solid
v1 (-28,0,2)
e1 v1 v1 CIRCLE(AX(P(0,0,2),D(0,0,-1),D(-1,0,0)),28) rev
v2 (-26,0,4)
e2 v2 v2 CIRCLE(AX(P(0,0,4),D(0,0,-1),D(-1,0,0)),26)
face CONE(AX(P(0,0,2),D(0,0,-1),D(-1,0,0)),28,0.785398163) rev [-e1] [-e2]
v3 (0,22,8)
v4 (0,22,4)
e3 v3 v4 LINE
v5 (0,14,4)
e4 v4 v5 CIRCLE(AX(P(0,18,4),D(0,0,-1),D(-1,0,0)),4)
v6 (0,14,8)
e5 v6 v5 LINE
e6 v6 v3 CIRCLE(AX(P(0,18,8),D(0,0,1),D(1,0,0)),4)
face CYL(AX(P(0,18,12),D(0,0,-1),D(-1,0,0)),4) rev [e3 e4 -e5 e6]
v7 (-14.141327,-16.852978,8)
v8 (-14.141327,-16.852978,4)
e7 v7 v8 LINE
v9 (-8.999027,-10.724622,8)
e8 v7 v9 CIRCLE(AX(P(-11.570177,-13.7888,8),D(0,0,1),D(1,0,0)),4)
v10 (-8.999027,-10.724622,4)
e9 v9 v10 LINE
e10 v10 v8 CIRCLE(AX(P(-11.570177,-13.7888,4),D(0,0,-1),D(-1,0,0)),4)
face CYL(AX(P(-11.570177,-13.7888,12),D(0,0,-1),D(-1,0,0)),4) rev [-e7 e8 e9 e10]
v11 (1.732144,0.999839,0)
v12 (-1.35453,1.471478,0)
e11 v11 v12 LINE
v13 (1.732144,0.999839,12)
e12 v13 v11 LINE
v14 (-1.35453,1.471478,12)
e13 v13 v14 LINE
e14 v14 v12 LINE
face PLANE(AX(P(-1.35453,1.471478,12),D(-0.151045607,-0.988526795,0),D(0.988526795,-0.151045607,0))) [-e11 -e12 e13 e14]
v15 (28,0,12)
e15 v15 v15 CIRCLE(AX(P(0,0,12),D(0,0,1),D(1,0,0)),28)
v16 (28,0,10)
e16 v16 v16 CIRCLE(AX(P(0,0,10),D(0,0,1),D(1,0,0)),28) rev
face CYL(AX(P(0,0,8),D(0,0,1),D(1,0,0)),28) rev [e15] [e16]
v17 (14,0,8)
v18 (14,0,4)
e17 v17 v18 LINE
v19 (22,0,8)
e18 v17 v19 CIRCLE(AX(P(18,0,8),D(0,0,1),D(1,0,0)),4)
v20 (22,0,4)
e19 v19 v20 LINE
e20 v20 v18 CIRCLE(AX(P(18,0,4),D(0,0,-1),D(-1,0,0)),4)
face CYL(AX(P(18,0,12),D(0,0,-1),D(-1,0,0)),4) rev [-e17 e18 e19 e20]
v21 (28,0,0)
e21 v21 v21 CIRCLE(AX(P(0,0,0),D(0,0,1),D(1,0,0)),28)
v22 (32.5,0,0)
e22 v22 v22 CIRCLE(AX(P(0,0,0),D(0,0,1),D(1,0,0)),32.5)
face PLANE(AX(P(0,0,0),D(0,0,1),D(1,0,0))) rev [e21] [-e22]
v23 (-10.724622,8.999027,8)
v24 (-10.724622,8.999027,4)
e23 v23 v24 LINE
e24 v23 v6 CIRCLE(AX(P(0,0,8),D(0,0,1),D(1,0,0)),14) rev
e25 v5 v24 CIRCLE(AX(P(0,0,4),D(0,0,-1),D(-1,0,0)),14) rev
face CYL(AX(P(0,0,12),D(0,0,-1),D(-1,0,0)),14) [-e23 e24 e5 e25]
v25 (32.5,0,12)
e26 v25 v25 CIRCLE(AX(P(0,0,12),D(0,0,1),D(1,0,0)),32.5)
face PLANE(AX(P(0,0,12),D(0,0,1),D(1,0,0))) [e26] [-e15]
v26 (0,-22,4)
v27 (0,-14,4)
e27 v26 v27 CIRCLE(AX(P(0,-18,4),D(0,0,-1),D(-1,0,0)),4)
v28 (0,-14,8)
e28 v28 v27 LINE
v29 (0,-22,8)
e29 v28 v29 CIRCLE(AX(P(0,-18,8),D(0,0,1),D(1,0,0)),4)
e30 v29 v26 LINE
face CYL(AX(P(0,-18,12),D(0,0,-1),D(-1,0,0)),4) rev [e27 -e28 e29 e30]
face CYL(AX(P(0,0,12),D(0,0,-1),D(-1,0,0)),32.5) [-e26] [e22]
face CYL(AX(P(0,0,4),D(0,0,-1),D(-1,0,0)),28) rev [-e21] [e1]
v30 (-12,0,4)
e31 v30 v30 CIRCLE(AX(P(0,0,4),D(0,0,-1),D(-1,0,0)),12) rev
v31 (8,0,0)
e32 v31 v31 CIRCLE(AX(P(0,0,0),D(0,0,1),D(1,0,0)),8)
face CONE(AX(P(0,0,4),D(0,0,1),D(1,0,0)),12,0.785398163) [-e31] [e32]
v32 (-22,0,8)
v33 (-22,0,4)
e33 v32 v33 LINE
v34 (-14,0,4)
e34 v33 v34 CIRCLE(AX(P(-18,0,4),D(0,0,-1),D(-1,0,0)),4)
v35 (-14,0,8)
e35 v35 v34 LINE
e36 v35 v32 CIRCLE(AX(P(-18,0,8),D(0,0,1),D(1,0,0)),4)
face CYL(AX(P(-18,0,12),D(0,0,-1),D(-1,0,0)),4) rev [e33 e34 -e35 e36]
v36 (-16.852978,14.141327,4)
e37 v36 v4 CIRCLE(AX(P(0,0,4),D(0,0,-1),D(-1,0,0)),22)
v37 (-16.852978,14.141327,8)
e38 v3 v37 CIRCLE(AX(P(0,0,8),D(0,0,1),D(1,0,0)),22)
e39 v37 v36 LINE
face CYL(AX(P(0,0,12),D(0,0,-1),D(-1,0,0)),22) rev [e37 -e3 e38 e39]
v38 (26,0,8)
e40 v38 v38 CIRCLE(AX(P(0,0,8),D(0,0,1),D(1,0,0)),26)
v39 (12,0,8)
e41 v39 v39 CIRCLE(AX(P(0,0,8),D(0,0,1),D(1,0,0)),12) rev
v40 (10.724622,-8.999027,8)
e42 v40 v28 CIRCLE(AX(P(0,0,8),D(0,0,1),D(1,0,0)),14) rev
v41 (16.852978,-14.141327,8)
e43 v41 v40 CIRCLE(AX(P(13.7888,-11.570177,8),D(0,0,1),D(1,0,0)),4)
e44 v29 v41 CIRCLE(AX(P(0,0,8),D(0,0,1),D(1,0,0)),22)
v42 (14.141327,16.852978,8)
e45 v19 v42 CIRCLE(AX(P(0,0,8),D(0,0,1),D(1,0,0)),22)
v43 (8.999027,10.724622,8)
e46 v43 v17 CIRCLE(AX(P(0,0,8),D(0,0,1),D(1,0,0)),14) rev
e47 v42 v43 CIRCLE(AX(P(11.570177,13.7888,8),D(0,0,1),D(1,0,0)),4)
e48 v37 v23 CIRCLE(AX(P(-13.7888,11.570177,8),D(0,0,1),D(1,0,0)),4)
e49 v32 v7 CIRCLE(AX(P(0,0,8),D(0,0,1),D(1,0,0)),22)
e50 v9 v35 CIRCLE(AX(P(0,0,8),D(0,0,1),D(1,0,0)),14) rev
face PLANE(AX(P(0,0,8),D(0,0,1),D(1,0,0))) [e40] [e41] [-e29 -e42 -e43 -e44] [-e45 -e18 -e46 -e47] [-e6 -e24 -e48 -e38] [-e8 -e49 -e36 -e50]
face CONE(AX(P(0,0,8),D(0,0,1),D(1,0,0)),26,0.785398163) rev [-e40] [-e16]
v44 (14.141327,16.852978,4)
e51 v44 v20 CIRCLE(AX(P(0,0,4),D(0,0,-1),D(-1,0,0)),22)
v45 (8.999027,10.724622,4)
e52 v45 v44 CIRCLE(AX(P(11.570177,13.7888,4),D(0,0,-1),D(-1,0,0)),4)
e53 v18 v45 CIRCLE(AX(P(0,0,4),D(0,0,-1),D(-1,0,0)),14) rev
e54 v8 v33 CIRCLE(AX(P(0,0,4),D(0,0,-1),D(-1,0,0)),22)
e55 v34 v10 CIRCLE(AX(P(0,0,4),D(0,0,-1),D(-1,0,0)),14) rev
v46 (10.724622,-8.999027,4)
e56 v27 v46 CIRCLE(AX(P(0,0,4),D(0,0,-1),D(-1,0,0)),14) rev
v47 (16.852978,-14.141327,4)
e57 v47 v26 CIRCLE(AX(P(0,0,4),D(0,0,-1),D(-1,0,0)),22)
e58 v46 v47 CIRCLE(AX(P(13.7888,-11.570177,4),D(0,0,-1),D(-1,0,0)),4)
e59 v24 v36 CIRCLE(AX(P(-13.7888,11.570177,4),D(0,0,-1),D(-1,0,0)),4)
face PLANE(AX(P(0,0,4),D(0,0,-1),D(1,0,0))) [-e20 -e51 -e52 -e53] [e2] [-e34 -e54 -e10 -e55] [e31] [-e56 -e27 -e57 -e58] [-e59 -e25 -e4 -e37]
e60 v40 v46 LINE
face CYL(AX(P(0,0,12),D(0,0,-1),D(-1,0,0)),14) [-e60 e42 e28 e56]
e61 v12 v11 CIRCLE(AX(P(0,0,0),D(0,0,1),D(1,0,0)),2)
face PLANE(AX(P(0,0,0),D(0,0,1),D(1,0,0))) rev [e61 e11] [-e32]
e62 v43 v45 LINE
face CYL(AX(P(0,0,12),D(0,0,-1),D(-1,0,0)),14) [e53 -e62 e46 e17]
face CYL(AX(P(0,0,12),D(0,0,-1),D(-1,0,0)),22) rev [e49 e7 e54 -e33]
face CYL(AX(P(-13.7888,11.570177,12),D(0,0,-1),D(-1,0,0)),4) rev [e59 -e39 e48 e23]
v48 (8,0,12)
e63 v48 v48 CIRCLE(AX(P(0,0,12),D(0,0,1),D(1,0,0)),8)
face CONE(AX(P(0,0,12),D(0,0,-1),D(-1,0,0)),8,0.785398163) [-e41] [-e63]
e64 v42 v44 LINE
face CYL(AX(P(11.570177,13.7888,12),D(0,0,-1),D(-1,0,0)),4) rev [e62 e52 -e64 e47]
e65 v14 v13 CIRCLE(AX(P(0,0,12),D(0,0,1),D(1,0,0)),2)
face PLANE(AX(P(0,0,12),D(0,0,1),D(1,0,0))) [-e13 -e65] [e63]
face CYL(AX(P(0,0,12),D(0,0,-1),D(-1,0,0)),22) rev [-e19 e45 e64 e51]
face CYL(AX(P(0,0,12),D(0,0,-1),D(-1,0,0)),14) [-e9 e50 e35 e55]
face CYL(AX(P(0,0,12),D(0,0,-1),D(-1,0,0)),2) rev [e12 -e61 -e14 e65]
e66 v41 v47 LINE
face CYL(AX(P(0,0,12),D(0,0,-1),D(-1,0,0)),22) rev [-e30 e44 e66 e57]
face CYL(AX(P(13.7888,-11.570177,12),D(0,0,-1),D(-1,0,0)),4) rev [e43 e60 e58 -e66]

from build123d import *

# Parameters (mm, degrees)
ESQUISSE1_R                  = 32.5
BOSS_EXTRU_1_DEPTH           = 12
ESQUISSE2_R                  = 28
ESQUISSE2_R_2                = 8
ENL_V_MAT_EXTRU_1_DEPTH      = 4
CHANFREIN1_SIZE              = 4
CHANFREIN2_SIZE              = 2
CHANFREIN1_OF_SYM_TRIE1_SIZE = 4
CHANFREIN2_OF_SYM_TRIE1_SIZE = 2


with BuildPart() as part:
    # Esquisse1 → Boss.-Extru.1 (new body)
    with BuildSketch(Plane.XY):
        Circle(ESQUISSE1_R)
        with BuildLine():
            Line((-1.354529956, 1.471478372), (1.732143973, 0.999838616))
            ThreePointArc((1.732143973, 0.999838616), (-0.302091213, -1.97705359), (-1.354529956, 1.471478372))
        make_face(mode=Mode.SUBTRACT)
        with BuildLine():
            ThreePointArc((-10.724622204, 8.999026536), (-5.916655664, 12.688309019), (0, 14))
            ThreePointArc((0, 14), (4, 18), (0, 22))
            ThreePointArc((0, 22), (-9.297601758, 19.938771315), (-16.852977749, 14.141327413))
            ThreePointArc((-16.852977749, 14.141327413), (-16.359950415, 8.505999202), (-10.724622204, 8.999026536))
        make_face(mode=Mode.SUBTRACT)
        with BuildLine():
            ThreePointArc((22, 0), (19.938771315, 9.297601758), (14.141327413, 16.852977749))
            ThreePointArc((14.141327413, 16.852977749), (8.505999202, 16.359950415), (8.999026536, 10.724622204))
            ThreePointArc((8.999026536, 10.724622204), (12.688309019, 5.916655664), (14, 0))
            ThreePointArc((14, 0), (18, -4), (22, 0))
        make_face(mode=Mode.SUBTRACT)
        with BuildLine():
            ThreePointArc((0, -22), (9.297601758, -19.938771315), (16.852977749, -14.141327413))
            ThreePointArc((16.852977749, -14.141327413), (16.359950415, -8.505999202), (10.724622204, -8.999026536))
            ThreePointArc((10.724622204, -8.999026536), (5.916655664, -12.688309019), (0, -14))
            ThreePointArc((0, -14), (-4, -18), (0, -22))
        make_face(mode=Mode.SUBTRACT)
        with BuildLine():
            ThreePointArc((-22, 0), (-19.938771315, -9.297601758), (-14.141327413, -16.852977749))
            ThreePointArc((-14.141327413, -16.852977749), (-8.505999202, -16.359950415), (-8.999026536, -10.724622204))
            ThreePointArc((-8.999026536, -10.724622204), (-12.688309019, -5.916655664), (-14, 0))
            ThreePointArc((-14, 0), (-18, 4), (-22, 0))
        make_face(mode=Mode.SUBTRACT)
    extrude(amount=BOSS_EXTRU_1_DEPTH)

    # Esquisse2 → Enlèv. mat.-Extru.1 (cut)
    with BuildSketch(Plane.XY.offset(12)):
        Circle(ESQUISSE2_R)
        Circle(ESQUISSE2_R_2, mode=Mode.SUBTRACT)
    enl_v_mat_extru_1 = extrude(amount=-ENL_V_MAT_EXTRU_1_DEPTH, mode=Mode.SUBTRACT)

    # Chanfrein1
    chanfrein1_edges = [part.edges().sort_by_distance(p)[0] for p in [
        (-8, 0, 8),
    ]]
    chamfer(chanfrein1_edges, length=CHANFREIN1_SIZE - 0.0001)  # a hair under: the kernel refuses the full size

    # Chanfrein2
    chanfrein2_edges = [part.edges().sort_by_distance(p)[0] for p in [
        (-28, 0, 8),
    ]]
    chamfer(chanfrein2_edges, length=CHANFREIN2_SIZE)

    # Symétrie1: Enlèv. mat.-Extru.1 across plane
    add(enl_v_mat_extru_1.mirror(Plane.XY.offset(6)), mode=Mode.SUBTRACT)

    # Chanfrein1 of Symétrie1
    chanfrein1_of_sym_trie1_edges = [part.edges().sort_by_distance(p)[0] for p in [
        (-8, 0, 4),
    ]]
    chamfer(chanfrein1_of_sym_trie1_edges, length=CHANFREIN1_OF_SYM_TRIE1_SIZE - 0.0001)  # a hair under: the kernel refuses the full size

    # Chanfrein2 of Symétrie1
    chanfrein2_of_sym_trie1_edges = [part.edges().sort_by_distance(p)[0] for p in [
        (-28, 0, 4),
    ]]
    chamfer(chanfrein2_of_sym_trie1_edges, length=CHANFREIN2_OF_SYM_TRIE1_SIZE)


solid = part.part
